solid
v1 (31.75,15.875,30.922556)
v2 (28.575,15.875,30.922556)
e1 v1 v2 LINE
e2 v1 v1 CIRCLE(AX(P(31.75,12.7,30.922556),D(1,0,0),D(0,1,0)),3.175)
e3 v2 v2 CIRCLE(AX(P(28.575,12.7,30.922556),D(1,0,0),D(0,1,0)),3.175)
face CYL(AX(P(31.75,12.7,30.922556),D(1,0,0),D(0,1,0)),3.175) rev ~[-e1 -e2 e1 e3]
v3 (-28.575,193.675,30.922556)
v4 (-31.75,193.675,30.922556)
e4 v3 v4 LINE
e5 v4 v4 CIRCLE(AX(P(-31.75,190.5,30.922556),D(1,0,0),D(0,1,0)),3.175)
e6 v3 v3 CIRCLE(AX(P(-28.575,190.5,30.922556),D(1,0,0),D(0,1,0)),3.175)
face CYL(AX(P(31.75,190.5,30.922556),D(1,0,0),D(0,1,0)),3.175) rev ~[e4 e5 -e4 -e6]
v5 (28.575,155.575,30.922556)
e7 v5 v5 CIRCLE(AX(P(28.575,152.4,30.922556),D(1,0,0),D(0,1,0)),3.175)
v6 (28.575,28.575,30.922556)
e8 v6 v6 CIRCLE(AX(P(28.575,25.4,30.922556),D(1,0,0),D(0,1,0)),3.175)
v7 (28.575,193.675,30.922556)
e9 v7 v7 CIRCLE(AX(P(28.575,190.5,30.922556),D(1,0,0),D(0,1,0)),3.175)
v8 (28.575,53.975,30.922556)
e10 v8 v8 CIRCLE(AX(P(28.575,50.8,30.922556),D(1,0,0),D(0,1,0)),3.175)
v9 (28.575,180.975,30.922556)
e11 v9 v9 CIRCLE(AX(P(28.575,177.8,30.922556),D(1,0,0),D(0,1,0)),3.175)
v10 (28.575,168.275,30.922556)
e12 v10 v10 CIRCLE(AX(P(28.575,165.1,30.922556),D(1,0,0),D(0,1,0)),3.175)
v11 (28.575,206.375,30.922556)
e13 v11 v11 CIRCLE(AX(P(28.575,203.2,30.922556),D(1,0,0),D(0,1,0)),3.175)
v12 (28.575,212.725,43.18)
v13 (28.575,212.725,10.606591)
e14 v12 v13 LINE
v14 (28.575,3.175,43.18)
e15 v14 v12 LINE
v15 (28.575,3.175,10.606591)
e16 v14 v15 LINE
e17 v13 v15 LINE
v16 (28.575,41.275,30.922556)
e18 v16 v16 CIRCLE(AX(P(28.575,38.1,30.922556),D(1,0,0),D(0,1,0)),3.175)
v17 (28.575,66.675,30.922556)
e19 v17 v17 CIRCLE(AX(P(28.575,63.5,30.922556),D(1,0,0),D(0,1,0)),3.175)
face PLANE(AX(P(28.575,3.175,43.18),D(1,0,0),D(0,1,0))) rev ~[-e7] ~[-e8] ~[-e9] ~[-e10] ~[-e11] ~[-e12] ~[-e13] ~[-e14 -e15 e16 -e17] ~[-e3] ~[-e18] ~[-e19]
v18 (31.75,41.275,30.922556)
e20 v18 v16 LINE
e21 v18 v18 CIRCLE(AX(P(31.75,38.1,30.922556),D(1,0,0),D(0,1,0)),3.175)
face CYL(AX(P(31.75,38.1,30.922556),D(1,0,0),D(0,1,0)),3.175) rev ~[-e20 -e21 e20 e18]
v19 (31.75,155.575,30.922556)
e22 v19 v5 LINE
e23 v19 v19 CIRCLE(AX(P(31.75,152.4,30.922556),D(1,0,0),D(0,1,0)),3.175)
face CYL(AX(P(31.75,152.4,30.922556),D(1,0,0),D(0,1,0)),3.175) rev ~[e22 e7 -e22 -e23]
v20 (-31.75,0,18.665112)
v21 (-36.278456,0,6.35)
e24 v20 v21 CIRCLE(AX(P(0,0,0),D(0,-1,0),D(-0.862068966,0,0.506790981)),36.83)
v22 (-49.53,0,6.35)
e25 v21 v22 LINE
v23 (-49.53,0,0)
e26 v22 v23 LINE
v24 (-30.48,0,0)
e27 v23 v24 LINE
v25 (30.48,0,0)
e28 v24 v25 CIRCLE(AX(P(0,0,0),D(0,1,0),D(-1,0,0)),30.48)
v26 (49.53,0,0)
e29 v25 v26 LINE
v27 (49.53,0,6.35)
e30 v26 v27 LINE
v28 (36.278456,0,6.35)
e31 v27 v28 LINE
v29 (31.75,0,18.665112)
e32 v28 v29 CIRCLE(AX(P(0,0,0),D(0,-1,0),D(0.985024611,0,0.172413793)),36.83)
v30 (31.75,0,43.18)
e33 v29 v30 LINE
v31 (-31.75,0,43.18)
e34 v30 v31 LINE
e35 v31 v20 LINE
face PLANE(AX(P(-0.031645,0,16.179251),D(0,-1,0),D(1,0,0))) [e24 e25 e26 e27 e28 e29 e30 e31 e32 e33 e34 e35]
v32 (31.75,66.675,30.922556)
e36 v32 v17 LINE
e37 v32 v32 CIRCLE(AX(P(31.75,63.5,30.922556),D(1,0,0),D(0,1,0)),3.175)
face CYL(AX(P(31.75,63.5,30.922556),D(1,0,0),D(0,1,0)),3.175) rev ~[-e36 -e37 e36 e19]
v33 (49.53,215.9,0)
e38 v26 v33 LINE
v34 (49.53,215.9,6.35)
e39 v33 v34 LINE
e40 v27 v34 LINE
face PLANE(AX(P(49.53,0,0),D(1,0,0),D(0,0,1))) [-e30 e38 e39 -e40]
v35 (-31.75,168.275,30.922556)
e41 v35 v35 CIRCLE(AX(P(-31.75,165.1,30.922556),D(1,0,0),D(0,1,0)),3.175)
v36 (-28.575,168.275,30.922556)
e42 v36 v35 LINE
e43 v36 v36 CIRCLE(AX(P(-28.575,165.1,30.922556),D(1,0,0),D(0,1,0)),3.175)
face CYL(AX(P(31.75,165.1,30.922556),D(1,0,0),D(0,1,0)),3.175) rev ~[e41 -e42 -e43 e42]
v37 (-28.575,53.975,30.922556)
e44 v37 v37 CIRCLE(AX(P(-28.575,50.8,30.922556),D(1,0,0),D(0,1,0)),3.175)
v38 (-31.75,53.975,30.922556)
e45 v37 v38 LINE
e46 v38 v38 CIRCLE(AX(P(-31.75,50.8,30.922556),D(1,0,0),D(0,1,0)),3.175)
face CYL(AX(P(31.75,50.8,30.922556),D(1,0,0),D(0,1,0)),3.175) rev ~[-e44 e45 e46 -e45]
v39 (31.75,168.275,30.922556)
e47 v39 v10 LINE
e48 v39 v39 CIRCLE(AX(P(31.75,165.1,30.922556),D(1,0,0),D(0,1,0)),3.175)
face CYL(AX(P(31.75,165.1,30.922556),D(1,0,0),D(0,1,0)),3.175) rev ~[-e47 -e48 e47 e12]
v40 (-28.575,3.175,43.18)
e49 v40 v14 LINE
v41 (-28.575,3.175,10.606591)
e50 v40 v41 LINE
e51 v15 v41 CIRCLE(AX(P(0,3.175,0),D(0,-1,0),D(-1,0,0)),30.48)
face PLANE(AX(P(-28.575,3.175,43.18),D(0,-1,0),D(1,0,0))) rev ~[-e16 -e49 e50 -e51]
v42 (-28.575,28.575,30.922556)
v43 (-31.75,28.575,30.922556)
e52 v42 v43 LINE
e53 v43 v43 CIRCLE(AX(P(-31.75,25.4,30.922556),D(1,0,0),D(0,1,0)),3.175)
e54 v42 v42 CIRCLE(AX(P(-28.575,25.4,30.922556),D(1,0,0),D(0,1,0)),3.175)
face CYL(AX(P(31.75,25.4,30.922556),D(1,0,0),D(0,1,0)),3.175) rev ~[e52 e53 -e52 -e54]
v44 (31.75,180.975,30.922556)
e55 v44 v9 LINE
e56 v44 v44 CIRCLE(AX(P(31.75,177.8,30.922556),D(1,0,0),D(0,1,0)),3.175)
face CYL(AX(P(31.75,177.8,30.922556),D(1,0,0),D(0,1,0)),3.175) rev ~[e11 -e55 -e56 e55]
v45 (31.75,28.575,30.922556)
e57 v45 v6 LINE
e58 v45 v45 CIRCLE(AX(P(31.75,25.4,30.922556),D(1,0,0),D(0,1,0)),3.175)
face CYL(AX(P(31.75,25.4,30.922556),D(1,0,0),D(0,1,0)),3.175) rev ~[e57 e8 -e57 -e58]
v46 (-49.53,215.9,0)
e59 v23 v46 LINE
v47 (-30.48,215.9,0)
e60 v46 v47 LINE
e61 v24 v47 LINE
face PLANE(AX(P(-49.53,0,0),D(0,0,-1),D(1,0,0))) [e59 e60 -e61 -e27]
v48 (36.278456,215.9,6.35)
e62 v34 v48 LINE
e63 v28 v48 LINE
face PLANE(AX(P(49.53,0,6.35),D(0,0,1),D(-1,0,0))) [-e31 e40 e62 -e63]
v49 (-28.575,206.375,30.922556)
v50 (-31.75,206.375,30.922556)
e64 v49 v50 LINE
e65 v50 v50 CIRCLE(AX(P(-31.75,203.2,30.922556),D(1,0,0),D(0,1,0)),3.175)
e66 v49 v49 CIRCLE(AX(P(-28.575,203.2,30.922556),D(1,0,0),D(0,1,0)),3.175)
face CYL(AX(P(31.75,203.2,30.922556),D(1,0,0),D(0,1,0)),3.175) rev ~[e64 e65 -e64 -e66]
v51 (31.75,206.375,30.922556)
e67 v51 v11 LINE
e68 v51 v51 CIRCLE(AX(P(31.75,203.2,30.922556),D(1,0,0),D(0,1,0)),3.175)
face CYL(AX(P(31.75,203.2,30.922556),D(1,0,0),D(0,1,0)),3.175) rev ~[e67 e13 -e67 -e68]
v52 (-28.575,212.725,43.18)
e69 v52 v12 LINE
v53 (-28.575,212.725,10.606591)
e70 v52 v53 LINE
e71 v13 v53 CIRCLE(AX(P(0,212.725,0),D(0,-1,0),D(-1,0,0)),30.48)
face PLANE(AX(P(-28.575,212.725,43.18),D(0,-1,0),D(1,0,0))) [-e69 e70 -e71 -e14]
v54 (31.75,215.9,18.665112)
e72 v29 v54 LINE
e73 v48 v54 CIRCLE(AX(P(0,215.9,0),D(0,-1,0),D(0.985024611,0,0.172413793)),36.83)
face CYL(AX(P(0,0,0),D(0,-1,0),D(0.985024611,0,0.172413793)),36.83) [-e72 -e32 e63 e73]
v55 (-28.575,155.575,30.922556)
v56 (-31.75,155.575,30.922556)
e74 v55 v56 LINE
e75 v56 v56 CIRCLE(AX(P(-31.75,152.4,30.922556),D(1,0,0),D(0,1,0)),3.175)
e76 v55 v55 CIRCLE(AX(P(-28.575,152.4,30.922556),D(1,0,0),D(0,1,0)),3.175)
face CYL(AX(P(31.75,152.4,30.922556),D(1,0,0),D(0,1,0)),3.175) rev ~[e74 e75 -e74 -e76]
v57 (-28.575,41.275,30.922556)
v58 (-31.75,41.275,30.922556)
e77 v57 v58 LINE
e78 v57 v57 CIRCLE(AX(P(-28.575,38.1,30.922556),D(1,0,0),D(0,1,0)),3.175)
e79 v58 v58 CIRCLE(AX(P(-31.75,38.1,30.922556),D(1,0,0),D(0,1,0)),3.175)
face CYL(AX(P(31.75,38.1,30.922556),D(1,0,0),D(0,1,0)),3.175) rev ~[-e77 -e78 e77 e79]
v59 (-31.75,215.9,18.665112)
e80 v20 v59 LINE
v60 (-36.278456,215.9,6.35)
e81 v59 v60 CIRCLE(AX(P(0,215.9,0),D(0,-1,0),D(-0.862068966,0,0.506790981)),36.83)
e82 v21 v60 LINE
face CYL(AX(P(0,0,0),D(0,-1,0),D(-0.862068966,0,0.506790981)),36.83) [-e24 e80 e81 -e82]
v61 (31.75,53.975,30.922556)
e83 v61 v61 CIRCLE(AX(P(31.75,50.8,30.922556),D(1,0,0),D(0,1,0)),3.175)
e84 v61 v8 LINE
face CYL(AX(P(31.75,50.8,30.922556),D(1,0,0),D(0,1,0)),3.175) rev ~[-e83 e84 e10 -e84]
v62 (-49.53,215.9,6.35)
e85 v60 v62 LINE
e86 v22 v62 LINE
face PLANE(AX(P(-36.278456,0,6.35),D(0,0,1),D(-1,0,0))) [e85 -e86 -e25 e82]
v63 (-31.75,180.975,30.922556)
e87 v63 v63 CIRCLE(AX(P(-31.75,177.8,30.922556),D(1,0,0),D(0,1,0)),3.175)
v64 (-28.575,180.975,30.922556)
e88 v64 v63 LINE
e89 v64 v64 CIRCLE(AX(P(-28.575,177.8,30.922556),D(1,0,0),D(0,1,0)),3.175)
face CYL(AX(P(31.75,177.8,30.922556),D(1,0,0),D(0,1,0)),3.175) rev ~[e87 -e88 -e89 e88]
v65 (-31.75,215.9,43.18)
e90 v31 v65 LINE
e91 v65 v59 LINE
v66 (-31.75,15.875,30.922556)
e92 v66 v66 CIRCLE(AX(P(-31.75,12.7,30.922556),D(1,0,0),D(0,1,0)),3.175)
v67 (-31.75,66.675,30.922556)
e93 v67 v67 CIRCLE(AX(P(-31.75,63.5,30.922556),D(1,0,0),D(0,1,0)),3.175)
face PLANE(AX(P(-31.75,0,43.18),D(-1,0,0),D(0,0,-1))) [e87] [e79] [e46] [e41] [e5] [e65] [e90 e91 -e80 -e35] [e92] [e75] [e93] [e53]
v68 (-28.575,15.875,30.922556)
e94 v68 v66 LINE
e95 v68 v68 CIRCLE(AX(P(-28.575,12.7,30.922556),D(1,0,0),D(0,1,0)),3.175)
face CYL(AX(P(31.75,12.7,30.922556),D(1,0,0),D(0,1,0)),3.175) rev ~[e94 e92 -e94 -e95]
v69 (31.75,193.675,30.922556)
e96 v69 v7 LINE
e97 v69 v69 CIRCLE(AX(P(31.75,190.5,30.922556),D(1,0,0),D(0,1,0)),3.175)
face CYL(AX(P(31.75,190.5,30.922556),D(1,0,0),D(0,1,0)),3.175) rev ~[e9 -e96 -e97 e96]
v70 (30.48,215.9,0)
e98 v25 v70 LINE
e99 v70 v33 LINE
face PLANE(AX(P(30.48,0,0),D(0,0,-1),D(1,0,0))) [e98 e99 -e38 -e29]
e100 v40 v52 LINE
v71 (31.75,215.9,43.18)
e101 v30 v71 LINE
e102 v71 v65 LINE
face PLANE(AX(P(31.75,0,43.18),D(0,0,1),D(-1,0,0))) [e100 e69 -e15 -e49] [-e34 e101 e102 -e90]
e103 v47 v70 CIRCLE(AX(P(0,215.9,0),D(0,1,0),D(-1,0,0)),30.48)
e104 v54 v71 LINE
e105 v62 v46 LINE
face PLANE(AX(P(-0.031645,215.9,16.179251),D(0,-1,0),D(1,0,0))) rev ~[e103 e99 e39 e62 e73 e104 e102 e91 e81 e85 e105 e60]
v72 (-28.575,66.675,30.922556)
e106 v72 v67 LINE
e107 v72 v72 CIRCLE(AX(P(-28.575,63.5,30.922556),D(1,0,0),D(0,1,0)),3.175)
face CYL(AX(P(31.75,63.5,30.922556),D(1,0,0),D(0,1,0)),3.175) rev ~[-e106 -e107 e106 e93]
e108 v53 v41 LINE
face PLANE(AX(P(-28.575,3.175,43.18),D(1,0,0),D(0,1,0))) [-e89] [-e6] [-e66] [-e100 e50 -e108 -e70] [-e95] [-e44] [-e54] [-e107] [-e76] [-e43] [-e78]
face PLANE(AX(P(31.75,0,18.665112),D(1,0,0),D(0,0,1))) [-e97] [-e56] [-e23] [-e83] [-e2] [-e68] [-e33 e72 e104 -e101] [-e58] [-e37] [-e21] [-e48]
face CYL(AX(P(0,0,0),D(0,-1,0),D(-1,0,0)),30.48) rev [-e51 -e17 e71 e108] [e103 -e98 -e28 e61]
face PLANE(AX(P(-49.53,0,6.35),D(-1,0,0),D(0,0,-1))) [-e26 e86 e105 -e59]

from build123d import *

# Parameters (mm, degrees)
F1_DEPTH = 215.9
F2_W     = 57.15
F2_H     = 209.55
F3_DEPTH = 32.5744088888
F4_R     = 3.175
F5_DEPTH = 81.281


# Not quite as in the source:
# - a feature names something its author has since deleted; it is built from what else it names


with BuildPart() as f1:
    # F0 (on Front) → F1 (new body)
    with BuildSketch(Plane.XZ):
        with BuildLine():
            Line((-36.83, 0), (-30.48, 0))
            ThreePointArc((-30.48, 0), (0, 30.48), (30.48, 0))
            Line((30.48, 0), (36.83, 0))
            Line((36.83, 0), (49.53, 0))
            Line((49.53, 0), (49.53, 6.35))
            Line((49.53, 6.35), (36.278456417, 6.35))
            ThreePointArc((36.278456417, 6.35), (34.5670828322, 12.7108490854), (31.75, 18.66511184))
            ThreePointArc((31.75, 18.66511184), (30.2489666674, 21.0106857469), (28.575, 23.2361415687))
            ThreePointArc((28.575, 23.2361415687), (0, 36.83), (-28.575, 23.2361415687))
            ThreePointArc((-28.575, 23.2361415687), (-30.2489666674, 21.0106857469), (-31.75, 18.66511184))
            ThreePointArc((-31.75, 18.66511184), (-34.5670828322, 12.7108490854), (-36.278456417, 6.35))
            Line((-36.278456417, 6.35), (-49.53, 6.35))
            Line((-49.53, 6.35), (-49.53, 0))
            Line((-49.53, 0), (-36.83, 0))
        make_face()
        with BuildLine():
            ThreePointArc((28.575, 23.2361415687), (30.2489666674, 21.0106857469), (31.75, 18.66511184))
            Line((31.75, 18.66511184), (31.75, 43.18))
            Line((31.75, 43.18), (28.575, 43.18))
            Line((28.575, 43.18), (28.575, 23.2361415687))
        make_face()
        with BuildLine():
            Line((-28.575, 43.18), (-28.575, 23.2361415687))
            ThreePointArc((-28.575, 23.2361415687), (0, 36.83), (28.575, 23.2361415687))
            Line((28.575, 23.2361415687), (28.575, 43.18))
            Line((28.575, 43.18), (-28.575, 43.18))
        make_face()
        with BuildLine():
            Line((-31.75, 43.18), (-31.75, 18.66511184))
            ThreePointArc((-31.75, 18.66511184), (-30.2489666674, 21.0106857469), (-28.575, 23.2361415687))
            Line((-28.575, 23.2361415687), (-28.575, 43.18))
            Line((-28.575, 43.18), (-31.75, 43.18))
        make_face()
    extrude(amount=-F1_DEPTH)

    # F2 (on face) → F3 (cut, through all)
    with BuildSketch(Plane.XY.offset(43.18)):
        with Locations((0, 107.95)):
            Rectangle(F2_W, F2_H)
    extrude(amount=-F3_DEPTH, mode=Mode.SUBTRACT)

    # F4 (on face) → F5 (cut, through all)
    with BuildSketch(Plane.YZ.offset(31.75)):
        with Locations((12.7, 30.92255592)):
            Circle(F4_R)
        with Locations((25.4, 30.92255592)):
            Circle(F4_R)
        with Locations((38.1, 30.92255592)):
            Circle(F4_R)
        with Locations((50.8, 30.92255592)):
            Circle(F4_R)
        with Locations((63.5, 30.92255592)):
            Circle(F4_R)
        with Locations((152.4, 30.92255592)):
            Circle(F4_R)
        with Locations((165.1, 30.92255592)):
            Circle(F4_R)
        with Locations((177.8, 30.92255592)):
            Circle(F4_R)
        with Locations((190.5, 30.92255592)):
            Circle(F4_R)
        with Locations((203.2, 30.92255592)):
            Circle(F4_R)
    extrude(amount=-F5_DEPTH, mode=Mode.SUBTRACT)


solid = f1.part
